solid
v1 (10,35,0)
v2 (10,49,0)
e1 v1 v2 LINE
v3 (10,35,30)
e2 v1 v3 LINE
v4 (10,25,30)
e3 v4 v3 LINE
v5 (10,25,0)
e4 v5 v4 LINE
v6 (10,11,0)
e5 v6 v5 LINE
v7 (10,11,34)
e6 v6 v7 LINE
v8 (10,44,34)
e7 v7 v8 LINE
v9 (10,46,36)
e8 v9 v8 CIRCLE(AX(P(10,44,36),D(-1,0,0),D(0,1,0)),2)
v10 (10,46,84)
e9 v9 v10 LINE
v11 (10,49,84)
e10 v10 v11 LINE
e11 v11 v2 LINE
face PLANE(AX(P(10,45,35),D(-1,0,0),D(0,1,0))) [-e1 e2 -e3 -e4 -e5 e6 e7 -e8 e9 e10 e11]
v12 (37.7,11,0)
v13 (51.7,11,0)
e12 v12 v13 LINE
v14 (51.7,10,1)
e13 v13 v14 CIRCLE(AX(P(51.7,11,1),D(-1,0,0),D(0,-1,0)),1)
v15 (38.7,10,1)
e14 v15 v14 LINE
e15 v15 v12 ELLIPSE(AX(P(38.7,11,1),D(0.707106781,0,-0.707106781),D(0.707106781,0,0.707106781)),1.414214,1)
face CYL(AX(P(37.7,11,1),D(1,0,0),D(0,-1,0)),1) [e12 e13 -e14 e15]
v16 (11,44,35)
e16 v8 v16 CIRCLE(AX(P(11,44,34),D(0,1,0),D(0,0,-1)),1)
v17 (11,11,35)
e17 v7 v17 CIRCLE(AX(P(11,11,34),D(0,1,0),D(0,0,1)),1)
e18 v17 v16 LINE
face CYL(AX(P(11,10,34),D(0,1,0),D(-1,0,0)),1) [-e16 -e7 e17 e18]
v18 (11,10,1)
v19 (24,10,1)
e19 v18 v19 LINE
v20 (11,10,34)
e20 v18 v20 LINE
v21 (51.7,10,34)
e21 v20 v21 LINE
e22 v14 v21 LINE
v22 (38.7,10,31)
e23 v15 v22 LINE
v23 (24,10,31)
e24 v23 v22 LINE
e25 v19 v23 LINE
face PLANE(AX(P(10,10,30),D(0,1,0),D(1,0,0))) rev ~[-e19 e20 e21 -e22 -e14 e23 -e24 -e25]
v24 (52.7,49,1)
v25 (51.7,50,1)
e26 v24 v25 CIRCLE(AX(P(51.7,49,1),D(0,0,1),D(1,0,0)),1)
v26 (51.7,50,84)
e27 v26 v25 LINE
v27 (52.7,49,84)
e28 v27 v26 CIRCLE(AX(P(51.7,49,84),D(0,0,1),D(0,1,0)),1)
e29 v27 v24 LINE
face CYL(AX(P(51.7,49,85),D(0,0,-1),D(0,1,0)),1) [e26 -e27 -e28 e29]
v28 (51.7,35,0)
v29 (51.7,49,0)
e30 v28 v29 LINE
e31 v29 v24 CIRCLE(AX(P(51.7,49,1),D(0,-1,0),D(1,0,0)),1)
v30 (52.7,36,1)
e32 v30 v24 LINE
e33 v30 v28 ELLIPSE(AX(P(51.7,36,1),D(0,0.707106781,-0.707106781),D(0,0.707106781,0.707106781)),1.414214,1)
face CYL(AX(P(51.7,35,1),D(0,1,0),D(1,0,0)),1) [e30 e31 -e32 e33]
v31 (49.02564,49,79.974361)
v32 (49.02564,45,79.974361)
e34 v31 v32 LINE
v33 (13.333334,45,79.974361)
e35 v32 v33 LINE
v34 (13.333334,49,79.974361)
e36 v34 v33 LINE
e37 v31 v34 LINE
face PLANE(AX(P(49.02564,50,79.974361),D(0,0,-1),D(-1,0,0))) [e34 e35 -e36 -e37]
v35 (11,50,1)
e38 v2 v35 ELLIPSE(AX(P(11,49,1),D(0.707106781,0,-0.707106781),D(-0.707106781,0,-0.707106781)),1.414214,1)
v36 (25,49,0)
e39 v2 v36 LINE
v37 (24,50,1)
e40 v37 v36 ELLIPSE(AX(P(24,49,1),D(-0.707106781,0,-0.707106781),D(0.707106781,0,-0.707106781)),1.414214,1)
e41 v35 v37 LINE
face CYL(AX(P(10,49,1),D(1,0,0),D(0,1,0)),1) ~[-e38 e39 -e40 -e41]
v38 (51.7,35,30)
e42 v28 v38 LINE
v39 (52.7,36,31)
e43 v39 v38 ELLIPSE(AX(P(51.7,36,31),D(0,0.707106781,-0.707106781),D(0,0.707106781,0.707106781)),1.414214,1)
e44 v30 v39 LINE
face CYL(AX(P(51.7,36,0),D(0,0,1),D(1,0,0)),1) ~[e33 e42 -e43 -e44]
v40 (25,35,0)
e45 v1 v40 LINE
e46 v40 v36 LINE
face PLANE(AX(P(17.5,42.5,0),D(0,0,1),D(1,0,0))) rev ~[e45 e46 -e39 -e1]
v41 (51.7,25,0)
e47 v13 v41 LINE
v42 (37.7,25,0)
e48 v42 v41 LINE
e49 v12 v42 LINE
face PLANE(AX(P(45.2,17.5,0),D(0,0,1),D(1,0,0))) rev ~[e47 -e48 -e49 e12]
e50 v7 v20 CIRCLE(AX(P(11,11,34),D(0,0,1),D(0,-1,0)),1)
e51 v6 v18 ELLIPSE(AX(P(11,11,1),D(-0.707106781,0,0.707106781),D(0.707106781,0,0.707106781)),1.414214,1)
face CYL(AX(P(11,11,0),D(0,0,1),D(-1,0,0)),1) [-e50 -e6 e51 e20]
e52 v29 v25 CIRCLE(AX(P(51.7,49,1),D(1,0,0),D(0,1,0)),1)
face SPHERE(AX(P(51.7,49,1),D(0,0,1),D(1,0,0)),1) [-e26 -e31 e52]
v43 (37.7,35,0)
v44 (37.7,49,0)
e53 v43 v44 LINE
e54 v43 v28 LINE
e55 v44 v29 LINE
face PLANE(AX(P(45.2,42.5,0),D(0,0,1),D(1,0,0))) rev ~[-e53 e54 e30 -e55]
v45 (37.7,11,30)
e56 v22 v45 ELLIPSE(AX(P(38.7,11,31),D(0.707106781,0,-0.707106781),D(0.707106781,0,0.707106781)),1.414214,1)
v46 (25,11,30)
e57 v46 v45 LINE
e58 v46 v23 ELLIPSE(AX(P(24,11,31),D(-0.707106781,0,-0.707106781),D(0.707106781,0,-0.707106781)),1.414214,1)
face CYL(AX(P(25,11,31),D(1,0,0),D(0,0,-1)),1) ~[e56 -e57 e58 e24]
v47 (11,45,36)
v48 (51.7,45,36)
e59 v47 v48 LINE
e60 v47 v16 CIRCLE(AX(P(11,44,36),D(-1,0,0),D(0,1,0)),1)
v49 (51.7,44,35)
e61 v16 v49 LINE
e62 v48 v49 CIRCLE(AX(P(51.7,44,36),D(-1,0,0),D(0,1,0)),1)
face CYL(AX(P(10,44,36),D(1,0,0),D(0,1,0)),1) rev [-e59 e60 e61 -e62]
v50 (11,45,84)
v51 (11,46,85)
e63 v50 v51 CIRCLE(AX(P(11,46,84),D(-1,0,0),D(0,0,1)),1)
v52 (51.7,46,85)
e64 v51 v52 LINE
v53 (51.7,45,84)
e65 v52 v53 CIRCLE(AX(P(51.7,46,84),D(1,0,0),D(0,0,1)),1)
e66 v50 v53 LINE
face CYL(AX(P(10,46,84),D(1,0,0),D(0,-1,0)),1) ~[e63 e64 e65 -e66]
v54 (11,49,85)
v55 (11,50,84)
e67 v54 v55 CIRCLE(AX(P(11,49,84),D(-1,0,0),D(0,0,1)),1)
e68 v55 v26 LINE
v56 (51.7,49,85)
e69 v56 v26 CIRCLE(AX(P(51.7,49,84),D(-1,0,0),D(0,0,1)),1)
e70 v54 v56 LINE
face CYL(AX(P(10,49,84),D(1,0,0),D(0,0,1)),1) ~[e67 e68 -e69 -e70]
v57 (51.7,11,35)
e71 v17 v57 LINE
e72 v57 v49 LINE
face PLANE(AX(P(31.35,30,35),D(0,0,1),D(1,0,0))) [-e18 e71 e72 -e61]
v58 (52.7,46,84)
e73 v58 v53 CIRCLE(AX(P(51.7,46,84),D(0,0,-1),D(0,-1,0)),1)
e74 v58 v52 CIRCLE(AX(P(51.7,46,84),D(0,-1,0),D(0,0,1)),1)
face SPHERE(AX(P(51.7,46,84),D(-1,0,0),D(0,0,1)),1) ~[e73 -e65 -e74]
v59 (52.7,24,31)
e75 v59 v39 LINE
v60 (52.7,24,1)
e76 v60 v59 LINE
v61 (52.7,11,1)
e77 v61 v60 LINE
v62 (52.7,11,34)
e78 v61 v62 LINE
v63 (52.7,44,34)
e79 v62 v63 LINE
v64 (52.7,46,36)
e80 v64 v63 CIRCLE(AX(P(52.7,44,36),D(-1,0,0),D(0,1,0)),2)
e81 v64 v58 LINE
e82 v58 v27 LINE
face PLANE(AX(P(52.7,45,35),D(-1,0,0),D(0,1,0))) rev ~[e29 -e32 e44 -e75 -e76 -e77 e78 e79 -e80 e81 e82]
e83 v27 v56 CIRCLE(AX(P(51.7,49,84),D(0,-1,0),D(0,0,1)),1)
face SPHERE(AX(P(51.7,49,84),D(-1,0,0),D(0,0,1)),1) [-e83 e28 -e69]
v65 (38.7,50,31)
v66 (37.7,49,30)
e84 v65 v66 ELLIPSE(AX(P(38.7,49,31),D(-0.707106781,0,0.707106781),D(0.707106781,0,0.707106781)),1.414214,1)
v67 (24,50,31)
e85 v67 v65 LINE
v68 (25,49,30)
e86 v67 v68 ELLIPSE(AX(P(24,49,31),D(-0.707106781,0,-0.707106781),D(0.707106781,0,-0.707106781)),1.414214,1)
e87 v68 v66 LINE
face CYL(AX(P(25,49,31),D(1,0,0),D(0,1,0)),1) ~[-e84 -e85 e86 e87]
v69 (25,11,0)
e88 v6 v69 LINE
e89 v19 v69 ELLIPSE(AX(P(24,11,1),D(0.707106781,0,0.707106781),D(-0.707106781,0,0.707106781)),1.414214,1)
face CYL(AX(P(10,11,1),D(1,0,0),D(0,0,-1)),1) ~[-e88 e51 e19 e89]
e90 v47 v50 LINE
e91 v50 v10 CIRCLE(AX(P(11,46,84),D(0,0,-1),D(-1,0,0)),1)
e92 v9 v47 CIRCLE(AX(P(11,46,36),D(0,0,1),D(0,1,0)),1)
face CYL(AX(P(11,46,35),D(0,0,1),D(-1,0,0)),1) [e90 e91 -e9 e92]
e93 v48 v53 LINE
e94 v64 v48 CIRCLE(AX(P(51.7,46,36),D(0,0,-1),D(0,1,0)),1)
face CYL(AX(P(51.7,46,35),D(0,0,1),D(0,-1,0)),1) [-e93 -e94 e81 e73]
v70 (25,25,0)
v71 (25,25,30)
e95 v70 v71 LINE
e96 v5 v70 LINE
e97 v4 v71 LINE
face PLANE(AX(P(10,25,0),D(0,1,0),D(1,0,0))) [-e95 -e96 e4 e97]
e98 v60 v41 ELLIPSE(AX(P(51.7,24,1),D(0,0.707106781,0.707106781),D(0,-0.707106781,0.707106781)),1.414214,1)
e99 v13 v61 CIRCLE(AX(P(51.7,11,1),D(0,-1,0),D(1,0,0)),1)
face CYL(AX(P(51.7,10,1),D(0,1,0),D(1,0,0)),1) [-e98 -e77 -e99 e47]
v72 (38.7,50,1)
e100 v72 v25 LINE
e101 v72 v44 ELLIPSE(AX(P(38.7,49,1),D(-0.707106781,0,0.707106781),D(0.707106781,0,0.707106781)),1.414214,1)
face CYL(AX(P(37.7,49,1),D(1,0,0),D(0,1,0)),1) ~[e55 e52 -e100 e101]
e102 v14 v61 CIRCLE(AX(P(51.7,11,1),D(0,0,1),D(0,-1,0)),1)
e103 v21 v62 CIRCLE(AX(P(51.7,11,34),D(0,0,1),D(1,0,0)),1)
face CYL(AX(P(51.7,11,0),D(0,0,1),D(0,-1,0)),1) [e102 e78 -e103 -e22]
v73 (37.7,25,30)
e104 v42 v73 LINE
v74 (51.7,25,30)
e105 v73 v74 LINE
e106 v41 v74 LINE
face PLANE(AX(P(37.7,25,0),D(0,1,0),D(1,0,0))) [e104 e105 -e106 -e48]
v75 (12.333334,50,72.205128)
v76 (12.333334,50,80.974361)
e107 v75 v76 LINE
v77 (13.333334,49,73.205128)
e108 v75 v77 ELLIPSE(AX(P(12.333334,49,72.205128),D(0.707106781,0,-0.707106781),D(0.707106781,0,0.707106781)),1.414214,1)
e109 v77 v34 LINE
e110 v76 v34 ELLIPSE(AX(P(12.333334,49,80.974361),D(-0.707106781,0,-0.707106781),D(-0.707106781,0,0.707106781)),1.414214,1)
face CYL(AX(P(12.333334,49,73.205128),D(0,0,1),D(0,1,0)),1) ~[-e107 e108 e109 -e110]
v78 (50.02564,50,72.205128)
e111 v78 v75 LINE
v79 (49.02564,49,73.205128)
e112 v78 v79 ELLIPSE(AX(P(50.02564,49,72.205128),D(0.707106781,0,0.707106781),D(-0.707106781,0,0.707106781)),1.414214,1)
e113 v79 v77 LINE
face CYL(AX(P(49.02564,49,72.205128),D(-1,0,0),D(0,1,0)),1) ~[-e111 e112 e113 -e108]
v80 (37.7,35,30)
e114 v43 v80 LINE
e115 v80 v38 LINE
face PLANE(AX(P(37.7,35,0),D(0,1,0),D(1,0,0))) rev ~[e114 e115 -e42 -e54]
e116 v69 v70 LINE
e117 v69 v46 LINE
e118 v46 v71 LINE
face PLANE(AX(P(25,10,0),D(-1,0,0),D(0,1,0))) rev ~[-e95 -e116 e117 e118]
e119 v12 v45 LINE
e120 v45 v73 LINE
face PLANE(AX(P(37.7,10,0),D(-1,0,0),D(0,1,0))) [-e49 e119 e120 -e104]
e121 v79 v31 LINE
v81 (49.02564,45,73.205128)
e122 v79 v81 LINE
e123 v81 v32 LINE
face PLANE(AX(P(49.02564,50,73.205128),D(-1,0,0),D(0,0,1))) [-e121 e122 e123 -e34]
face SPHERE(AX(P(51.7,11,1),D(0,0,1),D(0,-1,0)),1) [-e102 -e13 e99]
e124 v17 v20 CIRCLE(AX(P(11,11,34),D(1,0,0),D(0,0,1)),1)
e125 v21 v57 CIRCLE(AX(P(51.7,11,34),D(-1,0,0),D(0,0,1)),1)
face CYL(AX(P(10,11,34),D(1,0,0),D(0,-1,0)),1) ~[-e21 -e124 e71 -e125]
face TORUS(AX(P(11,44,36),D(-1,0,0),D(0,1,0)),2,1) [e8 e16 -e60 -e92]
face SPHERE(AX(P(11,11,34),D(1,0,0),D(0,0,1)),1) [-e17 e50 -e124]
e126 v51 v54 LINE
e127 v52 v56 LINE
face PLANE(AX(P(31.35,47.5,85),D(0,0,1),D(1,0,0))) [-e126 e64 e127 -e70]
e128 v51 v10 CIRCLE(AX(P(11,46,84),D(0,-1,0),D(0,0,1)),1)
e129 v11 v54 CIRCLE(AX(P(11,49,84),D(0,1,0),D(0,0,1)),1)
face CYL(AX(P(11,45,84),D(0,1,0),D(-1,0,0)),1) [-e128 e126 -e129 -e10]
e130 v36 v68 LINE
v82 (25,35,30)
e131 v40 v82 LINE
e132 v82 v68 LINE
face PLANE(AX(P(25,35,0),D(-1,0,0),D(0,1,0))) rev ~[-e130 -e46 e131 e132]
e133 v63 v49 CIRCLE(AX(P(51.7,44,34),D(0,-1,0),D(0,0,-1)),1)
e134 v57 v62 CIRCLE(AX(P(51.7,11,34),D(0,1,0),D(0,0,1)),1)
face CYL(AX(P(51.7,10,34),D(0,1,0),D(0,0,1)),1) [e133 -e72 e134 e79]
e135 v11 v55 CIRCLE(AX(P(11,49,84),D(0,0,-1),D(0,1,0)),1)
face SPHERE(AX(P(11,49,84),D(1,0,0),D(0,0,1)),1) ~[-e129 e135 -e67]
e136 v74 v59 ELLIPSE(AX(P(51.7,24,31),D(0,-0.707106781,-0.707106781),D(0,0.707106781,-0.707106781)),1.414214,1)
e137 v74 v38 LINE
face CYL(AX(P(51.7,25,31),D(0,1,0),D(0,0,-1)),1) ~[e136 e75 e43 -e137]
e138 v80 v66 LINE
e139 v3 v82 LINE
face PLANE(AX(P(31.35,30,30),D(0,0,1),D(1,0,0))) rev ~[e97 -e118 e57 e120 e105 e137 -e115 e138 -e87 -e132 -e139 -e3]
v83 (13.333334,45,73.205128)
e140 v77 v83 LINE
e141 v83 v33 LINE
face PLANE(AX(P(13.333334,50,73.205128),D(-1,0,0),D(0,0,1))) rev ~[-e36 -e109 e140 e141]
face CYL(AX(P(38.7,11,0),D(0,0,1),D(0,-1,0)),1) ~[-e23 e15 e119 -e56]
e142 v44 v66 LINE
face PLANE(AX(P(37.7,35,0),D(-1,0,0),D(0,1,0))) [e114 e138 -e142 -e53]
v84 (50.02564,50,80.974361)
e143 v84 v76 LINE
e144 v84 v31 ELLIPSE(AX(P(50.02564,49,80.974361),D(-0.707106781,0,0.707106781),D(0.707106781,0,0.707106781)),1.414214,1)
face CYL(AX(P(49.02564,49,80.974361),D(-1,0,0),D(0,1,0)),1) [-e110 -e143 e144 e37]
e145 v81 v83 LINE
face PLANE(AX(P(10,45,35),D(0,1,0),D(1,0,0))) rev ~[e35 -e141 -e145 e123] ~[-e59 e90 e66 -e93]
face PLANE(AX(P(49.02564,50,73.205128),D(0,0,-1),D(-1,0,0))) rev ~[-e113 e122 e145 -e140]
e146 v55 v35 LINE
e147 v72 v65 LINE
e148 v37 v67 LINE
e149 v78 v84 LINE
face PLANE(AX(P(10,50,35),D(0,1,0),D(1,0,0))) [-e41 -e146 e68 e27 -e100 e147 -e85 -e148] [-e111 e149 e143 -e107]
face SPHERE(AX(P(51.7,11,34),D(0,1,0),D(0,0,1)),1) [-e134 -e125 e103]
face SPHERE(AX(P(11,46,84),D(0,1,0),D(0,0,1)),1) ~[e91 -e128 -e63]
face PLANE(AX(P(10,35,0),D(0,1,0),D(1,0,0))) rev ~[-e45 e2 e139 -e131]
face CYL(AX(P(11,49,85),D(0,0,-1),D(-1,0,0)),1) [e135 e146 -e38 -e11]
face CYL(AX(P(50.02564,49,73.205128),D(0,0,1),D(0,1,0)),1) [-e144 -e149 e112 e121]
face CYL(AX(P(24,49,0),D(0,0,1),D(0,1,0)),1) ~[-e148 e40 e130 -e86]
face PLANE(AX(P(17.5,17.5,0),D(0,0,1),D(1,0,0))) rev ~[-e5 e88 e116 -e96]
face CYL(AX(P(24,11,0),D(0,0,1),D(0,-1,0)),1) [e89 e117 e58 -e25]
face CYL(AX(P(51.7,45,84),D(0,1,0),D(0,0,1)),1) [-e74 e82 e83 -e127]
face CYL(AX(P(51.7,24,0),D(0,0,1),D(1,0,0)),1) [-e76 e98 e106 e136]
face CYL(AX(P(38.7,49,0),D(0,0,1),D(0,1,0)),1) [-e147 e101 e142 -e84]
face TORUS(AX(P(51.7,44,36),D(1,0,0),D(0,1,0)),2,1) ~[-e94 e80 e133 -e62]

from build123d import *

# Parameters (mm, degrees)
F0_W     = 15
F0_H     = 15
F1_DEPTH = 30
F2_W     = 42.7
F2_H     = 40
F3_DEPTH = 5
F4_W     = 42.7
F4_H     = 5
F5_DEPTH = 50
F6_W     = 35.6923062354
F6_H     = 6.7692324519
F7_DEPTH = 25
F8_R     = 1


with BuildPart() as f1:
    # F0 (on Top) → F1 (new body)
    with BuildSketch(Plane.XY):
        with Locations((17.5, 17.5)):
            Rectangle(F0_W, F0_H)
    extrude(amount=F1_DEPTH)



with BuildPart() as f1b:
    # F0 (on Top) → F1, piece 2 (new body)
    with BuildSketch(Plane.XY):
        with Locations((17.5, 42.5)):
            Rectangle(F0_W, F0_H)
    extrude(amount=F1_DEPTH)


with BuildPart() as f1c:
    # F0 (on Top) → F1, piece 3 (new body)
    with BuildSketch(Plane.XY):
        with Locations((45.2, 17.5)):
            Rectangle(F0_W, F0_H)
    extrude(amount=F1_DEPTH)


with BuildPart() as f1d:
    # F0 (on Top) → F1, piece 4 (new body)
    with BuildSketch(Plane.XY):
        with Locations((45.2, 42.5)):
            Rectangle(F0_W, F0_H)
    extrude(amount=F1_DEPTH)


with BuildPart() as f1_1:
    add(f1.part)

    add(f1b.part)  # F3 merges F1b

    add(f1c.part)  # F3 merges F1c

    add(f1d.part)  # F3 merges F1d
    # F2 (on face) → F3 (join)
    with BuildSketch(Plane.XY.offset(30)):
        with Locations((31.35, 30)):
            Rectangle(F2_W, F2_H)
    extrude(amount=F3_DEPTH)

    # F4 (on face) → F5 (join)
    with BuildSketch(Plane.XY.offset(35)):
        with Locations((31.35, 47.5)):
            Rectangle(F4_W, F4_H)
    extrude(amount=F5_DEPTH)

    # F6 (on face) → F7 (cut)
    with BuildSketch(Plane(origin=(0, 50, 0), x_dir=(-1, 0, 0), z_dir=(0, 1, 0))):
        with Locations((-31.1794867739, 76.5897445381)):
            Rectangle(F6_W, F6_H)
    extrude(amount=-F7_DEPTH, mode=Mode.SUBTRACT)

    # F8
    f8_edges = [f1_1.edges().sort_by_distance(p)[0] for p in [
        (52.7, 27.5, 35),
        (31.35, 10, 35),
        (10, 27.5, 35),
        (31.35, 45, 35),
        (31.35, 50, 85),
        (10, 47.5, 85),
        (31.35, 45, 85),
        (52.7, 47.5, 85),
        (37.7, 10, 15),
        (31.35, 10, 30),
        (25, 10, 15),
        (17.5, 10, 0),
        (10, 10, 17.5),
        (52.7, 10, 17.5),
        (45.2, 10, 0),
        (52.7, 35, 15),
        (52.7, 30, 30),
        (52.7, 25, 15),
        (52.7, 17.5, 0),
        (52.7, 45, 60),
        (52.7, 50, 42.5),
        (52.7, 42.5, 0),
        (45.2, 50, 0),
        (10, 50, 42.5),
        (37.7, 50, 15),
        (17.5, 50, 0),
        (31.35, 50, 30),
        (25, 50, 15),
        (13.333334, 50, 76.589745),
        (31.179487, 50, 73.205128),
        (49.02564, 50, 76.589745),
        (31.179487, 50, 79.974361),
        (10, 45, 60),
    ]]
    fillet(f8_edges, radius=F8_R)


solid = f1_1.part
